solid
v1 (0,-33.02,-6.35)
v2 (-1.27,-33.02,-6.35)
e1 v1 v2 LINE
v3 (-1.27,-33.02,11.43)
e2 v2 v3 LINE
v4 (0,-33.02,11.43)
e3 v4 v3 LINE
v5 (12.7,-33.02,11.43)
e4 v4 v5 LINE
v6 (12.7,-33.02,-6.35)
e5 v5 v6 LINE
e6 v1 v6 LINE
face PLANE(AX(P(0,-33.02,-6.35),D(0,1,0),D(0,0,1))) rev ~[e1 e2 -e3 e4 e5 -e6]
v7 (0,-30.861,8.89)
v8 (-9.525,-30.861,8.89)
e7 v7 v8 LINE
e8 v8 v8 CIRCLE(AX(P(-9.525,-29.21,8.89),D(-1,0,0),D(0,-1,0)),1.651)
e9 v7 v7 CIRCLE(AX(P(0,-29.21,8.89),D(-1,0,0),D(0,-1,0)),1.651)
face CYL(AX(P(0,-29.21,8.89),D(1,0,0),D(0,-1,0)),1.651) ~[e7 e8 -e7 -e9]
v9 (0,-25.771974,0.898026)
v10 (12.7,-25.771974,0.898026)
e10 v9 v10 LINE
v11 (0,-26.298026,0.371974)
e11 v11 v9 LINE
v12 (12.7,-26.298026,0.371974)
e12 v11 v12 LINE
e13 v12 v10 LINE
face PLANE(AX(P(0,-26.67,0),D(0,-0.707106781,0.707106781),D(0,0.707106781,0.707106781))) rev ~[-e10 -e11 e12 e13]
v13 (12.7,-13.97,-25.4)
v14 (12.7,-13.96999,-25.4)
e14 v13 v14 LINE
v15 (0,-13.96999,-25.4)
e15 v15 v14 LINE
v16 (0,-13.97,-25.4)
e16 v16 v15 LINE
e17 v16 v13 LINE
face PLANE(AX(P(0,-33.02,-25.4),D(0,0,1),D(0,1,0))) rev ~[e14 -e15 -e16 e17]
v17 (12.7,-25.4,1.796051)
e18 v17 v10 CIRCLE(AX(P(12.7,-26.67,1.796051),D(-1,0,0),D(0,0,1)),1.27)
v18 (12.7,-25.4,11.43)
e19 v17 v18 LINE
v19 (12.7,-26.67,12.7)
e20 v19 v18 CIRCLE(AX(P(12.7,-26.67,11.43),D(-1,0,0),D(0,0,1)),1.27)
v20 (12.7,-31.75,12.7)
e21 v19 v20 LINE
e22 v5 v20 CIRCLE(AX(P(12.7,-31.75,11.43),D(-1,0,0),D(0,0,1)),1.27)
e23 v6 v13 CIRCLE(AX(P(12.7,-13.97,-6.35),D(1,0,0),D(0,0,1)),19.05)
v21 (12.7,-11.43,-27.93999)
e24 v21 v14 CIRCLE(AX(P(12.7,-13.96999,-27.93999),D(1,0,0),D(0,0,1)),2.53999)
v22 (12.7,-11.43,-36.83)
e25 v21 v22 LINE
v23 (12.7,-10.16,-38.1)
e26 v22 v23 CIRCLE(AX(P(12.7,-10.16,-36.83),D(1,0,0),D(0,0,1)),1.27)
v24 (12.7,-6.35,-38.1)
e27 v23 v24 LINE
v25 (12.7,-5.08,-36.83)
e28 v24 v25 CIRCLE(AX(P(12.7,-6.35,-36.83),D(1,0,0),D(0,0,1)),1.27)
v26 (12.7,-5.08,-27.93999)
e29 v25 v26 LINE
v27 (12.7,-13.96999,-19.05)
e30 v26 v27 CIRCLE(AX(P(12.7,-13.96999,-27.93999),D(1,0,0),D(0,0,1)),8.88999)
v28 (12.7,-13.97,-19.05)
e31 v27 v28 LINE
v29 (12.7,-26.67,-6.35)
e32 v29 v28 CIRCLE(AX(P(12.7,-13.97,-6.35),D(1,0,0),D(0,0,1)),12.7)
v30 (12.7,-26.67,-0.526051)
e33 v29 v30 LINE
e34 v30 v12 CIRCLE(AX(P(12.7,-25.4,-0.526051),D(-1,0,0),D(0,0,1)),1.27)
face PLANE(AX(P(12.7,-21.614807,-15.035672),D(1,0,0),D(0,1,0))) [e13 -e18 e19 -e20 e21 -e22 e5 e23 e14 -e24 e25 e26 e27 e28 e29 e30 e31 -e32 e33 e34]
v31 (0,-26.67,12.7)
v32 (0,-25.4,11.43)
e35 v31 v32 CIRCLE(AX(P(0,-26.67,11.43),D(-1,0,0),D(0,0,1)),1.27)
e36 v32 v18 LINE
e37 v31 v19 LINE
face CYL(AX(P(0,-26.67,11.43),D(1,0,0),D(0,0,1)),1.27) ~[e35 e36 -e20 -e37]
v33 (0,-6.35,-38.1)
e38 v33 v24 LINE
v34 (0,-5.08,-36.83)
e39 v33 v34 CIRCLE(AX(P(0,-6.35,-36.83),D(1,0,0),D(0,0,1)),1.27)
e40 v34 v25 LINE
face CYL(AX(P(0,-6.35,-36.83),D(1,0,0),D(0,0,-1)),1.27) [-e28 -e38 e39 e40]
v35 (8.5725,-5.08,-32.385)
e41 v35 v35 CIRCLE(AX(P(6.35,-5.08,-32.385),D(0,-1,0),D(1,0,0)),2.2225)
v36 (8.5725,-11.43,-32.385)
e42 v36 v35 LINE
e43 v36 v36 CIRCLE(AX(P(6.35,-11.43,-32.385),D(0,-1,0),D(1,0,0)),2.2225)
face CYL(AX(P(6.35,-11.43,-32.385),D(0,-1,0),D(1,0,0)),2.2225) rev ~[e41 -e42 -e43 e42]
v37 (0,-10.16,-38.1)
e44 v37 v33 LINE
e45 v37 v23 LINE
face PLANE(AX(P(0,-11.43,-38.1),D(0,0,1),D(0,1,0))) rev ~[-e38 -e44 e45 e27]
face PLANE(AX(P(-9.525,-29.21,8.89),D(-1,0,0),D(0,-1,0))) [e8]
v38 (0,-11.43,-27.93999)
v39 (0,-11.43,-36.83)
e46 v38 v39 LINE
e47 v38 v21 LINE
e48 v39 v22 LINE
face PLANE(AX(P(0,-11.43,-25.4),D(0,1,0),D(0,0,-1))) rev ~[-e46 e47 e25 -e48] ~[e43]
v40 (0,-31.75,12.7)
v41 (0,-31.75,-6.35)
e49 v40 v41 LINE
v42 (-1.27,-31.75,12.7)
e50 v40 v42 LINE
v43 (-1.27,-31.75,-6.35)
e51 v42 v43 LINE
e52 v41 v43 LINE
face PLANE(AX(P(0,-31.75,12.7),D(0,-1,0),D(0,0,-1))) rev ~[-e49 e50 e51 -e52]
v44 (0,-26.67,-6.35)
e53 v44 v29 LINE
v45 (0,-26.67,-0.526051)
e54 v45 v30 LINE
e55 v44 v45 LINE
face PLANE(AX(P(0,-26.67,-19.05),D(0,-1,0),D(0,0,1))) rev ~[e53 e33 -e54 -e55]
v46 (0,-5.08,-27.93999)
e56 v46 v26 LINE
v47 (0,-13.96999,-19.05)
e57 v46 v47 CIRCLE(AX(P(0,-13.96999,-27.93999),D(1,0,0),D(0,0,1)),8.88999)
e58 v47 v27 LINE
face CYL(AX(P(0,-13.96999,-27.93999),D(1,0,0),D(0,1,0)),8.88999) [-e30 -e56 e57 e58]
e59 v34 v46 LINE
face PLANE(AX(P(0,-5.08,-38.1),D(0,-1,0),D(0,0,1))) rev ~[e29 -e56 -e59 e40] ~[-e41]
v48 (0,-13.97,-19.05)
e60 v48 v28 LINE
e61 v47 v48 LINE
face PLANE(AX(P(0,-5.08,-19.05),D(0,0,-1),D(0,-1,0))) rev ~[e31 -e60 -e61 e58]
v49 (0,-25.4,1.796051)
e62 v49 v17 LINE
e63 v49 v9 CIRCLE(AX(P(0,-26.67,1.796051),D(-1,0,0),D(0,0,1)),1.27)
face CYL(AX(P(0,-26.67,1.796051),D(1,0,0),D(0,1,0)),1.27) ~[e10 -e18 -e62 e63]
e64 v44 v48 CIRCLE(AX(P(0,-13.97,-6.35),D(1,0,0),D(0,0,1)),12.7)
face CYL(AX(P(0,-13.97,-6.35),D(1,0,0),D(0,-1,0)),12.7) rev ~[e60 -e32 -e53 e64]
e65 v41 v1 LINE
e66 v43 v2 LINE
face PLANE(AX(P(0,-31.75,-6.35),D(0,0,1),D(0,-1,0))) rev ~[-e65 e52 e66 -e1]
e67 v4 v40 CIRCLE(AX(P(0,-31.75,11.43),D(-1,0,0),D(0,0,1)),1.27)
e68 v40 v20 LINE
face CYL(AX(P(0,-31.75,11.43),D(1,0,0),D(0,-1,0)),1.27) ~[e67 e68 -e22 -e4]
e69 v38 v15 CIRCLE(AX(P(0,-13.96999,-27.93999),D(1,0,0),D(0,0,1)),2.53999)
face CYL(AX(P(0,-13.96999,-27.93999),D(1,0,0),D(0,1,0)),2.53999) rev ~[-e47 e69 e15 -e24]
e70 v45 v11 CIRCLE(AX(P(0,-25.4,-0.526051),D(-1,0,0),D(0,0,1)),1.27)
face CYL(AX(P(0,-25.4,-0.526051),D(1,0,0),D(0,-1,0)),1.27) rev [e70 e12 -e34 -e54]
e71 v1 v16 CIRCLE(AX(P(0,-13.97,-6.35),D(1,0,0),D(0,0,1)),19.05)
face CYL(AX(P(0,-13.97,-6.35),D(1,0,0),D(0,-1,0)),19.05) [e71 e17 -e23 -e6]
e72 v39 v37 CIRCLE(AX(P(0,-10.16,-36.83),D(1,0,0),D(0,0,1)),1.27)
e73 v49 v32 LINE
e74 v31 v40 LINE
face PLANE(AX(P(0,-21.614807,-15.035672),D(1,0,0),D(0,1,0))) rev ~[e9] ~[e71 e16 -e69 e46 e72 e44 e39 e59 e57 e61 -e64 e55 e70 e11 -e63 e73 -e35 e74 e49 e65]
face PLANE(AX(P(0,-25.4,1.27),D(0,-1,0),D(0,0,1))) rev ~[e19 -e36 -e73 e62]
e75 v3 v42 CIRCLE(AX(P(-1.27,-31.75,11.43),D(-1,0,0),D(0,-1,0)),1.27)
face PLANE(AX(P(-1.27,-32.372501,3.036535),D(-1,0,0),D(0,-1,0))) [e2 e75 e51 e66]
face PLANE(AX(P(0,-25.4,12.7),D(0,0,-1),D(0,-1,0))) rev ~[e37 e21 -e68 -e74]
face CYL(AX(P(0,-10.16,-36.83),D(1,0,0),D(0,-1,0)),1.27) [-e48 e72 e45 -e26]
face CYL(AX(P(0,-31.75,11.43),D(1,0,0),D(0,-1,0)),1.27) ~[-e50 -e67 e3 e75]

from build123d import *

# Parameters (mm, degrees)
F2_DEPTH  = 12.7
F3_R      = 12.7
F4_R      = 19.05
F5_R      = 8.88999
F6_R      = 2.53999
F7_R      = 1.27
F8_R      = 2.2225
F9_DEPTH  = 6.35
F10_R     = 1.651
F11_DEPTH = 9.525
F13_DEPTH = 1.27


# Not quite as in the source:
# - a fillet or chamfer is up to 0.001 mm smaller than in the source, because OpenCascade refuses the exact size


with BuildPart() as f2:
    # F1 (on Right) → F2 (new body)
    with BuildSketch(Plane.YZ):
        Polygon((-26.67, -19.05), (-26.67, 0), (-25.4, 1.27), (-25.4, 12.7), (-33.02, 12.7), (-33.02, -25.4), (-11.43, -25.4), (-11.43, -38.1), (-5.08, -38.1), (-5.08, -19.05), align=None)
    extrude(amount=F2_DEPTH)

    # F3
    f3_edges = [f2.edges().sort_by_distance(p)[0] for p in [
        (6.35, -26.67, -19.05),
    ]]
    fillet(f3_edges, radius=F3_R)

    # F4
    f4_edges = [f2.edges().sort_by_distance(p)[0] for p in [
        (6.35, -33.02, -25.4),
    ]]
    fillet(f4_edges, radius=F4_R)

    # F5 (radius 8.89 in the source; OpenCascade refuses exactly that, so slightly less here)
    f5_edges = [f2.edges().sort_by_distance(p)[0] for p in [
        (6.35, -5.08, -19.05),
    ]]
    fillet(f5_edges, radius=F5_R)

    # F6 (radius 2.54 in the source; OpenCascade refuses exactly that, so slightly less here)
    f6_edges = [f2.edges().sort_by_distance(p)[0] for p in [
        (6.35, -11.43, -25.4),
    ]]
    fillet(f6_edges, radius=F6_R)

    # F7
    f7_edges = [f2.edges().sort_by_distance(p)[0] for p in [
        (6.35, -26.67, 0),
        (6.35, -25.4, 1.27),
        (6.35, -25.4, 12.7),
        (6.35, -33.02, 12.7),
        (6.35, -11.43, -38.1),
        (6.35, -5.08, -38.1),
    ]]
    fillet(f7_edges, radius=F7_R)

    # F8 (on face) → F9 (cut)
    with BuildSketch(Plane.XZ.offset(11.43)):
        with Locations((6.35, -32.385)):
            Circle(F8_R)
    extrude(amount=-F9_DEPTH, mode=Mode.SUBTRACT)

    # F10 (on face) → F11 (join)
    with BuildSketch(Plane(origin=(0, 0, 0), x_dir=(0, -1, 0), z_dir=(-1, 0, 0))):
        with Locations((29.21, 8.89)):
            Circle(F10_R)
    extrude(amount=F11_DEPTH)

    # F12 (on face) → F13 (join)
    with BuildSketch(Plane(origin=(0, 0, 0), x_dir=(0, -1, 0), z_dir=(-1, 0, 0))):
        with BuildLine():
            Line((31.75, -6.35), (33.02, -6.35))
            Line((33.02, -6.35), (33.02, 11.43))
            ThreePointArc((33.02, 11.43), (32.6480256121, 12.3280256121), (31.75, 12.7))
            Line((31.75, 12.7), (31.75, -6.35))
        make_face()
    extrude(amount=F13_DEPTH)


solid = f2.part
